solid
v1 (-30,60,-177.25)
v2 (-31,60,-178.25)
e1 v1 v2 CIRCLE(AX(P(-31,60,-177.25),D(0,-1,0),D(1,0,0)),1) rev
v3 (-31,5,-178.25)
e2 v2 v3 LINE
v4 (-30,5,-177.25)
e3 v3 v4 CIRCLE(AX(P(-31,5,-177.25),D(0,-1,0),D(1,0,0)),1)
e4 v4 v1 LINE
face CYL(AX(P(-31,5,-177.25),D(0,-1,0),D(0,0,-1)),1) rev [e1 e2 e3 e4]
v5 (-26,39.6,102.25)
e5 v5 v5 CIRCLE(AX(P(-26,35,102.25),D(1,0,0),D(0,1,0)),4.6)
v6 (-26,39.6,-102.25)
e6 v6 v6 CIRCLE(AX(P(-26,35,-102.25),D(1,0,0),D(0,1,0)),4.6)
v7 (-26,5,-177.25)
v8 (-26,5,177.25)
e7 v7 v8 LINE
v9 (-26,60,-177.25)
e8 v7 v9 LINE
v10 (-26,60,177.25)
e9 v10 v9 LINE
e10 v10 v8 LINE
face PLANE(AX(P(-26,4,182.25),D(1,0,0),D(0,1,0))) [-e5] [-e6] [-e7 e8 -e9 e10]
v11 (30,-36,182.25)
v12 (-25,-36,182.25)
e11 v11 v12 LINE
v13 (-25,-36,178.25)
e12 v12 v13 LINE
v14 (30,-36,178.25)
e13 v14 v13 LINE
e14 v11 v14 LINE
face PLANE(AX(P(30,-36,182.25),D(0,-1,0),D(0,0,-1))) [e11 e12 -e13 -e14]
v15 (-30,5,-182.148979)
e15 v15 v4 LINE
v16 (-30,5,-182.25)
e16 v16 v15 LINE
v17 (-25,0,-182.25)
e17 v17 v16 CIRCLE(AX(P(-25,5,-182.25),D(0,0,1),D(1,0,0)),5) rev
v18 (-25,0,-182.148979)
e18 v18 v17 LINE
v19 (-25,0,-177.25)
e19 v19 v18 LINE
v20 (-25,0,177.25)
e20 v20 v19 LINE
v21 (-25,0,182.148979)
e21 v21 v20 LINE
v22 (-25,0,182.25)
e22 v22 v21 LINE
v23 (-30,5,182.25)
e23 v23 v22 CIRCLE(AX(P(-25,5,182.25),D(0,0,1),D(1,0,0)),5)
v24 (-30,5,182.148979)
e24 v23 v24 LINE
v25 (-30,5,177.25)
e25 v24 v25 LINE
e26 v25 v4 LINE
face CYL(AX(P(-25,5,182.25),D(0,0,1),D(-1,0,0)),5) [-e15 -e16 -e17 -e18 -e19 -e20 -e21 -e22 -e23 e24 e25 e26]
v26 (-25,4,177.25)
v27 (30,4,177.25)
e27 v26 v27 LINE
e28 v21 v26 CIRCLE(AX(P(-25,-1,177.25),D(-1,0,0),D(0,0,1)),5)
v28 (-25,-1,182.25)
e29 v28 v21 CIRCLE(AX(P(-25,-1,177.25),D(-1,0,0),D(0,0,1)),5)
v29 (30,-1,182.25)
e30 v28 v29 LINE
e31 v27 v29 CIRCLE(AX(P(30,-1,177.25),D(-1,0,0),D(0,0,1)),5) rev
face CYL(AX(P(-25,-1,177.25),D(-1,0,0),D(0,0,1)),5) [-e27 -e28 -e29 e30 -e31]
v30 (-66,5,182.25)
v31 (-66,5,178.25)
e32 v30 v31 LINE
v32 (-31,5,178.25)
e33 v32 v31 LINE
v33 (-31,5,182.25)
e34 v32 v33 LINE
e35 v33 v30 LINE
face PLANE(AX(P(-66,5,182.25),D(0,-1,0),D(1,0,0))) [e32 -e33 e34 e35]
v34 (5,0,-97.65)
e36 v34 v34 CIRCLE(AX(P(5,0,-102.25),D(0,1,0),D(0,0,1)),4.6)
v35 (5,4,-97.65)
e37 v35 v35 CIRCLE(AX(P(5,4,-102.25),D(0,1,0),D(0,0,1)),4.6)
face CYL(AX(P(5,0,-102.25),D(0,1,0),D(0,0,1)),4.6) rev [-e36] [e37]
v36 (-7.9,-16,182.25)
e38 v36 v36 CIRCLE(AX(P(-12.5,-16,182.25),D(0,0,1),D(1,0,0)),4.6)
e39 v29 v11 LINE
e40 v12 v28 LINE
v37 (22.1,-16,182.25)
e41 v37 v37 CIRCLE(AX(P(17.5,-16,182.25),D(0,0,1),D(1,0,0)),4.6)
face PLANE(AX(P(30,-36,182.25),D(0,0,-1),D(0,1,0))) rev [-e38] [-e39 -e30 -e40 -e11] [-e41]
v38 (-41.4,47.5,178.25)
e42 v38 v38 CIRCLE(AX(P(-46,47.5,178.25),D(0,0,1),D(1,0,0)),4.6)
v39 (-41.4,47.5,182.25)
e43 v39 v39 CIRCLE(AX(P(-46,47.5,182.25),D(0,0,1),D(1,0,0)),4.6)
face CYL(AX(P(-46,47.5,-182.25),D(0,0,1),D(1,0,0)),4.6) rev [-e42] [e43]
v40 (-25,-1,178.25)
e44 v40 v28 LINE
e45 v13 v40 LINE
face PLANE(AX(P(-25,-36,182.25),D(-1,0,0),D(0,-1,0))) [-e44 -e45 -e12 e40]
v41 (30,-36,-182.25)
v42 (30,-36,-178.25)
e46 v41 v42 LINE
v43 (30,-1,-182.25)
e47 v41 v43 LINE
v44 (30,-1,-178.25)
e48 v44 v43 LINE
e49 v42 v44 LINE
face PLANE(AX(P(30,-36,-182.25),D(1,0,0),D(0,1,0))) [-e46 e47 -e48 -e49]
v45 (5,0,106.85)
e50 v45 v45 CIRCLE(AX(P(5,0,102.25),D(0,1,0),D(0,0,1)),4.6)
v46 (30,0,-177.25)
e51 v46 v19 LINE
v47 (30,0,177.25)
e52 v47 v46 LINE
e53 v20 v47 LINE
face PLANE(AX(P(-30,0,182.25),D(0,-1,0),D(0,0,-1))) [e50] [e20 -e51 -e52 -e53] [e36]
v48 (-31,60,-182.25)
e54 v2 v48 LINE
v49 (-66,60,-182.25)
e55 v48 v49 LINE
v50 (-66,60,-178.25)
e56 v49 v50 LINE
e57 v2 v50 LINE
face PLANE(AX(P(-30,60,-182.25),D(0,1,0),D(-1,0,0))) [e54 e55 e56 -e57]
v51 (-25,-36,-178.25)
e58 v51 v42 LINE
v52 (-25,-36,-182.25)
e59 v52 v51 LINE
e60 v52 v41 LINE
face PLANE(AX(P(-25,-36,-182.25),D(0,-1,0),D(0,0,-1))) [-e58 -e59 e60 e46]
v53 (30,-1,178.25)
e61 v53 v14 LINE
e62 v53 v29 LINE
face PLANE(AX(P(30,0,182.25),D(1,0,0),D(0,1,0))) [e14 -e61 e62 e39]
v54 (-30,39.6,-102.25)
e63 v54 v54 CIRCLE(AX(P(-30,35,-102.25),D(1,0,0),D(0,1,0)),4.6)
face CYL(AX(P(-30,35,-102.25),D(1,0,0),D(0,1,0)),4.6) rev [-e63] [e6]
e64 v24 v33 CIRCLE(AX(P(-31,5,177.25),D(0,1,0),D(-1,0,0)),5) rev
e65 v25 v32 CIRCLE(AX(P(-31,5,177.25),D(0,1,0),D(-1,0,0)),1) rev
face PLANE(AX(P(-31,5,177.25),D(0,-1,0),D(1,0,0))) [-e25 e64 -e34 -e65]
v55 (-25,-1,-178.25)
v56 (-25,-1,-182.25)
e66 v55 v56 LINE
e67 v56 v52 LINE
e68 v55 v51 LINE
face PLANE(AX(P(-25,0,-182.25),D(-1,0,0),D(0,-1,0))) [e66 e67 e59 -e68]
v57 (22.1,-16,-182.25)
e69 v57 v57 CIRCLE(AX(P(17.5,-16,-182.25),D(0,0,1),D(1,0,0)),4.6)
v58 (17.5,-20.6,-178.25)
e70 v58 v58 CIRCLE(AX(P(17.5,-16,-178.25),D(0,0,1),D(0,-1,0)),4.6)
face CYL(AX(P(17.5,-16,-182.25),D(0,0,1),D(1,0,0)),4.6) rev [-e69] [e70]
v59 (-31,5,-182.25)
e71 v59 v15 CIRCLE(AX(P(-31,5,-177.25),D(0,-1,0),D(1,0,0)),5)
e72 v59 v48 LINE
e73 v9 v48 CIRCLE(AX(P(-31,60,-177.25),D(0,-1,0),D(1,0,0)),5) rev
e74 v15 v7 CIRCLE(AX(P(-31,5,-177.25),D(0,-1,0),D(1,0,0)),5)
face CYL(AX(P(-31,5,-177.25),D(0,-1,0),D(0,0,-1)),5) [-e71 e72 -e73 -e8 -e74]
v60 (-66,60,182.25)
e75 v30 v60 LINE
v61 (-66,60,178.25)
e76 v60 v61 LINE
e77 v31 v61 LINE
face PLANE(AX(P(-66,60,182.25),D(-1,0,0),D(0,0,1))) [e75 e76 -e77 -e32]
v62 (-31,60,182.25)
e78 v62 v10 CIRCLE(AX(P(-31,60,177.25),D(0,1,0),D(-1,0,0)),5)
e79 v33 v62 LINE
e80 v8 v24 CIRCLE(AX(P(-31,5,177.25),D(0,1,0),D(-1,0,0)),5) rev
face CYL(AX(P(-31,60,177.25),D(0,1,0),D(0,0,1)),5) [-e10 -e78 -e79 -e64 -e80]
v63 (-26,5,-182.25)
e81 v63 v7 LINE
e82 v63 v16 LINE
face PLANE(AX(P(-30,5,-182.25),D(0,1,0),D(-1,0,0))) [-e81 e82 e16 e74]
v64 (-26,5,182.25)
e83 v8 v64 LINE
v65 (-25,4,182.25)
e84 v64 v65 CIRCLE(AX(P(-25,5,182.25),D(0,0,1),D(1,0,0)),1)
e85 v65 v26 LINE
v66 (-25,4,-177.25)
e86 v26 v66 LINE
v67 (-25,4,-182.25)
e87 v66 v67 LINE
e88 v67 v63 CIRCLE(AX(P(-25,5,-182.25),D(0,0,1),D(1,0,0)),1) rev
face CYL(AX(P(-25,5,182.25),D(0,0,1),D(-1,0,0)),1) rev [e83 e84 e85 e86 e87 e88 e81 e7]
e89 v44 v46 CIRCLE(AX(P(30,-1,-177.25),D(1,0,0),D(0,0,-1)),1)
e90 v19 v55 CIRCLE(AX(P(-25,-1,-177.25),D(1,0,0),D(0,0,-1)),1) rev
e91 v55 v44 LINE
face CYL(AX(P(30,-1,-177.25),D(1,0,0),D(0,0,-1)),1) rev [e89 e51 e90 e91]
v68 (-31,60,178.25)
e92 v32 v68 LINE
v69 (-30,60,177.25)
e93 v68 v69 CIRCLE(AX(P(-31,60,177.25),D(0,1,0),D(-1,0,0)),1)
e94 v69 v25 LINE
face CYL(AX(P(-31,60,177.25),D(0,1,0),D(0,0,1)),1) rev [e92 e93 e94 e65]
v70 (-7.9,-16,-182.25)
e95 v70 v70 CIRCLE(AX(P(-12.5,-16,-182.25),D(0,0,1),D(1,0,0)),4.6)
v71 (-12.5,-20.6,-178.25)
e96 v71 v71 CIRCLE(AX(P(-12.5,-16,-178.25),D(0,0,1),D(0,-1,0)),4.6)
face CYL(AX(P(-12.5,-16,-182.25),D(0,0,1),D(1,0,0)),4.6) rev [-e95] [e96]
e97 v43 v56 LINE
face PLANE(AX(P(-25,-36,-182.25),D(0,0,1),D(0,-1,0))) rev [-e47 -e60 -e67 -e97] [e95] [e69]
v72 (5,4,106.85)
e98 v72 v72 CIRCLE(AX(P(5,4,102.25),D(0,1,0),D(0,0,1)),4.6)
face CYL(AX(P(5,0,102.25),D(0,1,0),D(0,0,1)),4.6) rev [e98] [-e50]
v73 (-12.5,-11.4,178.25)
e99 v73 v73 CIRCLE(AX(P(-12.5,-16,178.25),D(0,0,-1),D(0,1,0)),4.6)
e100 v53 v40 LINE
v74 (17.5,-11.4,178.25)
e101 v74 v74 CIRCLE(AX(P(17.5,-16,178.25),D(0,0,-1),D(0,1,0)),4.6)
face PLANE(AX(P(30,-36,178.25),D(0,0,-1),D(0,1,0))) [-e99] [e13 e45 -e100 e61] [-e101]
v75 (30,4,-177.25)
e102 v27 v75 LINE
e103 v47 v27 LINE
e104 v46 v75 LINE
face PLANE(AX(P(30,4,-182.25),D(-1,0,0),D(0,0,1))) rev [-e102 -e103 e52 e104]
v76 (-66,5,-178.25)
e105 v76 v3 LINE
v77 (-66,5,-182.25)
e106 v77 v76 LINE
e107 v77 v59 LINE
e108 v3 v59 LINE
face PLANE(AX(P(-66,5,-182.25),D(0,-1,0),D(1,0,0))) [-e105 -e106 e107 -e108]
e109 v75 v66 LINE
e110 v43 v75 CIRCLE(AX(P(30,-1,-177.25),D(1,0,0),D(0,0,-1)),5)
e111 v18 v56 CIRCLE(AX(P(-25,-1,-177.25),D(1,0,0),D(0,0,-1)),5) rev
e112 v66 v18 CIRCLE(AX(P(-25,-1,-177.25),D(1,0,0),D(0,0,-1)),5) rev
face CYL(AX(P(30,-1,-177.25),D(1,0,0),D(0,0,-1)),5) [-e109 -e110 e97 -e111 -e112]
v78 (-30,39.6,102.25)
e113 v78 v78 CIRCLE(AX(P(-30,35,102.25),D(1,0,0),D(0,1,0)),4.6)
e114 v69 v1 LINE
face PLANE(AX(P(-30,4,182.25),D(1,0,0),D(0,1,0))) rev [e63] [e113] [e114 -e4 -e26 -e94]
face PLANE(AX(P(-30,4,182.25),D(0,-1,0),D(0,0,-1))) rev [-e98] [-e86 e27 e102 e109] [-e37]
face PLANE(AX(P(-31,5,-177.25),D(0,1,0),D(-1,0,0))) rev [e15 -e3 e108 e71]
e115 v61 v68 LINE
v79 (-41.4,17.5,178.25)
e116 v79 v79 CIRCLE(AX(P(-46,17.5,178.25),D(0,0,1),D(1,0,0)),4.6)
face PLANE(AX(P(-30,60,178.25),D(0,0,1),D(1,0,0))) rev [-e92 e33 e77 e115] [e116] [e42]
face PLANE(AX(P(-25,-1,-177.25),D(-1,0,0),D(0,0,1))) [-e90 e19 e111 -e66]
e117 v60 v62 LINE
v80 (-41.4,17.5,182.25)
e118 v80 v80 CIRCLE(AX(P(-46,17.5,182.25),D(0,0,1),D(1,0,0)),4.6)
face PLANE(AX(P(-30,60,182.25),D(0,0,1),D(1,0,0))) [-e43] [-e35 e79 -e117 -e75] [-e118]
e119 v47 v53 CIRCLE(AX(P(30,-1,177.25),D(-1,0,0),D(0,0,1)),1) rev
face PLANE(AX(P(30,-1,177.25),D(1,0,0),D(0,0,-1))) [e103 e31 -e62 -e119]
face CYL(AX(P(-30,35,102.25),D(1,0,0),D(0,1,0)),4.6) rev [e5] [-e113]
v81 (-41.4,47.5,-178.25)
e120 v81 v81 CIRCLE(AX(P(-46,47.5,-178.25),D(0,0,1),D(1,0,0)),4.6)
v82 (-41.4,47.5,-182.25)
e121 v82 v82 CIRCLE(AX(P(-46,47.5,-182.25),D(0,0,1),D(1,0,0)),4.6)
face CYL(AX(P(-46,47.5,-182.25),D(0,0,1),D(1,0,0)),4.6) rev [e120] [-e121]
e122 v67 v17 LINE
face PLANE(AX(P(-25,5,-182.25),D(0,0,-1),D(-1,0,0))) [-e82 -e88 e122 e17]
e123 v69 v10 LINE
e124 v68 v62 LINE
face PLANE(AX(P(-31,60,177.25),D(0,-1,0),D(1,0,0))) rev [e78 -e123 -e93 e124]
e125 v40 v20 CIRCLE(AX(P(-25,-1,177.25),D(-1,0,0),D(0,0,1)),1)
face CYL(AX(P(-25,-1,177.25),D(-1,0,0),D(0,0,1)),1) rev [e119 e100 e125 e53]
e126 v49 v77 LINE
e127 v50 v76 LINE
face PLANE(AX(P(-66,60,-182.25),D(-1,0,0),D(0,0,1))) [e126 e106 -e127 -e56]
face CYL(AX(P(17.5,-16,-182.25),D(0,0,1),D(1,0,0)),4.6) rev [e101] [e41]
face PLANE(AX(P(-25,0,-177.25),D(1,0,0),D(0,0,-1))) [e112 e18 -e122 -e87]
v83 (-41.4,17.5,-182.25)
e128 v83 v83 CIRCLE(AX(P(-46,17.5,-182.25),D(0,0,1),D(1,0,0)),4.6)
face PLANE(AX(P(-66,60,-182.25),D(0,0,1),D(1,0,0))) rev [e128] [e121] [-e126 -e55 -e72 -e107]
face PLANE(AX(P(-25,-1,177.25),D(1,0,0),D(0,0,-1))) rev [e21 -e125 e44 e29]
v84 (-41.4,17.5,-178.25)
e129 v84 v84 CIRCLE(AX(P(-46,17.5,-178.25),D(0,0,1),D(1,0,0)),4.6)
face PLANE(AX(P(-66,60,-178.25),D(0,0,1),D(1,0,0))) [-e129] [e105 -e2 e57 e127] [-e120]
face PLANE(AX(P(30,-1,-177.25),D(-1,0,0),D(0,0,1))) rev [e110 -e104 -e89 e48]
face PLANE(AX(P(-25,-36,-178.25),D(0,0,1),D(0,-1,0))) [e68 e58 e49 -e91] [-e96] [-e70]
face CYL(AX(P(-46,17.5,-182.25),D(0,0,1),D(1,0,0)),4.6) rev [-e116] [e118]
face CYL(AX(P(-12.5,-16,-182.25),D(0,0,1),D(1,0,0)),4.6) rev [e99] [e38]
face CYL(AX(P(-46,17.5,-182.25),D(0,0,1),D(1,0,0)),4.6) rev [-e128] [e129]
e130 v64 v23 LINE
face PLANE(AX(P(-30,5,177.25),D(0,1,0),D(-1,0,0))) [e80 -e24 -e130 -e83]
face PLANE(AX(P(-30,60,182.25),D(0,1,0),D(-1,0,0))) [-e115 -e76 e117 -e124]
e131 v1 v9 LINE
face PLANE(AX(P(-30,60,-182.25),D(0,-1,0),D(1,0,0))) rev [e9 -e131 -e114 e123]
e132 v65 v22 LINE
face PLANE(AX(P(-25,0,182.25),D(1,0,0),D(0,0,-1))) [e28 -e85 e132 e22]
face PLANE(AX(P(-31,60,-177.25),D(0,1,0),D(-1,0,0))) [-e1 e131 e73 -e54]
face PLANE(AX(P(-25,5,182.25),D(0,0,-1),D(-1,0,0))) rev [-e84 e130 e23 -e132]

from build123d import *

# Parameters (mm, degrees)
SKETCH1_W                      = 60
SKETCH1_H                      = 364.5
BASE_FLANGE1_DEPTH             = 4
EDGE_FLANGE1_STRIP_W           = 18
EDGE_FLANGE1_STRIP_H           = 4
EDGE_FLANGE1_STRIP_CUT_DEPTH   = 364.5
EDGE_FLANGE1_DEPTH             = 364.5
EDGE_FLANGE2_STRIP_W           = 18
EDGE_FLANGE2_STRIP_H           = 4
EDGE_FLANGE2_STRIP_CUT_DEPTH   = 55
EDGE_FLANGE2_STRIP_2_W         = 18
EDGE_FLANGE2_STRIP_2_H         = 4
EDGE_FLANGE2_STRIP_CUT_2_DEPTH = 55
EDGE_FLANGE2_STRIP_3_W         = 18
EDGE_FLANGE2_STRIP_3_H         = 4
EDGE_FLANGE2_STRIP_CUT_3_DEPTH = 55
EDGE_FLANGE2_STRIP_4_W         = 18
EDGE_FLANGE2_STRIP_4_H         = 4
EDGE_FLANGE2_STRIP_CUT_4_DEPTH = 55
EDGE_FLANGE2_DEPTH             = 55
EDGE_FLANGE2_BEND_DEPTH        = 55
EDGE_FLANGE2_BEND_2_DEPTH      = 55
EDGE_FLANGE2_BEND_3_DEPTH      = 55
SKETCH18_R                     = 4.6
EXTRUDE1_DEPTH                 = 376.254913359
SKETCH19_R                     = 4.6
EXTRUDE2_DEPTH                 = 4
SKETCH20_R                     = 4.6
EXTRUDE3_DEPTH                 = 4


# Sheet-metal steps are written as plain solids
with BuildPart() as part:
    # Sketch1 → Base-Flange1 (new body)
    with BuildSketch(Plane(origin=(0, 0, 0), x_dir=(1, 0, 0), z_dir=(0, 1, 0))):
        Rectangle(SKETCH1_W, SKETCH1_H)
    extrude(amount=BASE_FLANGE1_DEPTH)

    # Edge-Flange1 strip (across the edge) → Edge-Flange1 strip cut (cut)
    with BuildSketch(Plane(origin=(-30, 4, -182.25), x_dir=(1, 0, 0), z_dir=(0, 0, 1))):
        with Locations((-4, -2)):
            Rectangle(EDGE_FLANGE1_STRIP_W, EDGE_FLANGE1_STRIP_H)
    extrude(amount=EDGE_FLANGE1_STRIP_CUT_DEPTH, mode=Mode.SUBTRACT)

    # Edge-Flange1 section (across the edge) → Edge-Flange1 (add)
    with BuildSketch(Plane(origin=(-30, 4, -182.25), x_dir=(1, 0, 0), z_dir=(0, 0, 1))):
        with BuildLine():
            Line((0, 1), (0, 56))
            Line((0, 56), (4, 56))
            Line((4, 56), (4, 1))
            ThreePointArc((4, 1), (4.292893219, 0.292893219), (5, 0))
            Line((5, 0), (5, -4))
            ThreePointArc((5, -4), (1.464466094, -2.535533906), (0, 1))
        make_face()
    extrude(amount=EDGE_FLANGE1_DEPTH)

    # Edge-Flange2 strip (across the edge) → Edge-Flange2 strip cut (cut)
    with BuildSketch(Plane(origin=(-30, 5, 182.25), x_dir=(0, 0, -1), z_dir=(0, 1, 0))):
        with Locations((-4, -2)):
            Rectangle(EDGE_FLANGE2_STRIP_W, EDGE_FLANGE2_STRIP_H)
    extrude(amount=EDGE_FLANGE2_STRIP_CUT_DEPTH, mode=Mode.SUBTRACT)

    # Edge-Flange2 strip 2 (across the edge) → Edge-Flange2 strip cut 2 (cut)
    with BuildSketch(Plane(origin=(30, 0, 182.25), x_dir=(0, 0, -1), z_dir=(-1, 0, 0))):
        with Locations((-4, -2)):
            Rectangle(EDGE_FLANGE2_STRIP_2_W, EDGE_FLANGE2_STRIP_2_H)
    extrude(amount=EDGE_FLANGE2_STRIP_CUT_2_DEPTH, mode=Mode.SUBTRACT)

    # Edge-Flange2 strip 3 (across the edge) → Edge-Flange2 strip cut 3 (cut)
    with BuildSketch(Plane(origin=(-30, 60, -182.25), x_dir=(0, 0, 1), z_dir=(0, -1, 0))):
        with Locations((-4, -2)):
            Rectangle(EDGE_FLANGE2_STRIP_3_W, EDGE_FLANGE2_STRIP_3_H)
    extrude(amount=EDGE_FLANGE2_STRIP_CUT_3_DEPTH, mode=Mode.SUBTRACT)

    # Edge-Flange2 strip 4 (across the edge) → Edge-Flange2 strip cut 4 (cut)
    with BuildSketch(Plane(origin=(-25, 0, -182.25), x_dir=(0, 0, 1), z_dir=(1, 0, 0))):
        with Locations((-4, -2)):
            Rectangle(EDGE_FLANGE2_STRIP_4_W, EDGE_FLANGE2_STRIP_4_H)
    extrude(amount=EDGE_FLANGE2_STRIP_CUT_4_DEPTH, mode=Mode.SUBTRACT)

    # Edge-Flange2 section (across the edge) → Edge-Flange2 (add)
    with BuildSketch(Plane(origin=(-30, 5, 182.25), x_dir=(0, 0, -1), z_dir=(0, 1, 0))):
        with BuildLine():
            Line((0, 1), (0, 36))
            Line((0, 36), (4, 36))
            Line((4, 36), (4, 1))
            ThreePointArc((4, 1), (4.292893219, 0.292893219), (5, 0))
            Line((5, 0), (5, -4))
            ThreePointArc((5, -4), (1.464466094, -2.535533906), (0, 1))
        make_face()
    extrude(amount=EDGE_FLANGE2_DEPTH)

    # Edge-Flange2 section 2 (across the edge) → Edge-Flange2 bend (add)
    with BuildSketch(Plane(origin=(30, 0, 182.25), x_dir=(0, 0, -1), z_dir=(-1, 0, 0))):
        with BuildLine():
            Line((0, 1), (0, 36))
            Line((0, 36), (4, 36))
            Line((4, 36), (4, 1))
            ThreePointArc((4, 1), (4.292893219, 0.292893219), (5, 0))
            Line((5, 0), (5, -4))
            ThreePointArc((5, -4), (1.464466094, -2.535533906), (0, 1))
        make_face()
    extrude(amount=EDGE_FLANGE2_BEND_DEPTH)

    # Edge-Flange2 section 3 (across the edge) → Edge-Flange2 bend 2 (add)
    with BuildSketch(Plane(origin=(-30, 60, -182.25), x_dir=(0, 0, 1), z_dir=(0, -1, 0))):
        with BuildLine():
            Line((0, 1), (0, 36))
            Line((0, 36), (4, 36))
            Line((4, 36), (4, 1))
            ThreePointArc((4, 1), (4.292893219, 0.292893219), (5, 0))
            Line((5, 0), (5, -4))
            ThreePointArc((5, -4), (1.464466094, -2.535533906), (0, 1))
        make_face()
    extrude(amount=EDGE_FLANGE2_BEND_2_DEPTH)

    # Edge-Flange2 section 4 (across the edge) → Edge-Flange2 bend 3 (add)
    with BuildSketch(Plane(origin=(-25, 0, -182.25), x_dir=(0, 0, 1), z_dir=(1, 0, 0))):
        with BuildLine():
            Line((0, 1), (0, 36))
            Line((0, 36), (4, 36))
            Line((4, 36), (4, 1))
            ThreePointArc((4, 1), (4.292893219, 0.292893219), (5, 0))
            Line((5, 0), (5, -4))
            ThreePointArc((5, -4), (1.464466094, -2.535533906), (0, 1))
        make_face()
    extrude(amount=EDGE_FLANGE2_BEND_3_DEPTH)

    # Sketch18 → Extrude1 (cut, through all)
    with BuildSketch(Plane.XY.offset(182.25)):
        with Locations((-46, 47.5)):
            Circle(SKETCH18_R)
        with Locations((-46, 17.5)):
            Circle(SKETCH18_R)
        with Locations((-12.5, -16)):
            Circle(SKETCH18_R)
        with Locations((17.5, -16)):
            Circle(SKETCH18_R)
    extrude(amount=-EXTRUDE1_DEPTH, mode=Mode.SUBTRACT)

    # Sketch19 → Extrude2 (cut)
    with BuildSketch(Plane(origin=(-26, 0, 0), x_dir=(0, 0, -1), z_dir=(1, 0, 0))):
        with Locations(Location((-102.25, 35, 0), (0, 0, 90))):
            Circle(SKETCH19_R)
        with Locations(Location((102.25, 35, 0), (0, 0, 90))):
            Circle(SKETCH19_R)
    extrude(amount=-EXTRUDE2_DEPTH, mode=Mode.SUBTRACT)

    # Sketch20 → Extrude3 (cut)
    with BuildSketch(Plane(origin=(0, 4, 0), x_dir=(1, 0, 0), z_dir=(0, 1, 0))):
        with Locations(Location((5, 102.25, 0), (0, 0, 270))):
            Circle(SKETCH20_R)
        with Locations(Location((5, -102.25, 0), (0, 0, 270))):
            Circle(SKETCH20_R)
    extrude(amount=-EXTRUDE3_DEPTH, mode=Mode.SUBTRACT)


solid = part.part
